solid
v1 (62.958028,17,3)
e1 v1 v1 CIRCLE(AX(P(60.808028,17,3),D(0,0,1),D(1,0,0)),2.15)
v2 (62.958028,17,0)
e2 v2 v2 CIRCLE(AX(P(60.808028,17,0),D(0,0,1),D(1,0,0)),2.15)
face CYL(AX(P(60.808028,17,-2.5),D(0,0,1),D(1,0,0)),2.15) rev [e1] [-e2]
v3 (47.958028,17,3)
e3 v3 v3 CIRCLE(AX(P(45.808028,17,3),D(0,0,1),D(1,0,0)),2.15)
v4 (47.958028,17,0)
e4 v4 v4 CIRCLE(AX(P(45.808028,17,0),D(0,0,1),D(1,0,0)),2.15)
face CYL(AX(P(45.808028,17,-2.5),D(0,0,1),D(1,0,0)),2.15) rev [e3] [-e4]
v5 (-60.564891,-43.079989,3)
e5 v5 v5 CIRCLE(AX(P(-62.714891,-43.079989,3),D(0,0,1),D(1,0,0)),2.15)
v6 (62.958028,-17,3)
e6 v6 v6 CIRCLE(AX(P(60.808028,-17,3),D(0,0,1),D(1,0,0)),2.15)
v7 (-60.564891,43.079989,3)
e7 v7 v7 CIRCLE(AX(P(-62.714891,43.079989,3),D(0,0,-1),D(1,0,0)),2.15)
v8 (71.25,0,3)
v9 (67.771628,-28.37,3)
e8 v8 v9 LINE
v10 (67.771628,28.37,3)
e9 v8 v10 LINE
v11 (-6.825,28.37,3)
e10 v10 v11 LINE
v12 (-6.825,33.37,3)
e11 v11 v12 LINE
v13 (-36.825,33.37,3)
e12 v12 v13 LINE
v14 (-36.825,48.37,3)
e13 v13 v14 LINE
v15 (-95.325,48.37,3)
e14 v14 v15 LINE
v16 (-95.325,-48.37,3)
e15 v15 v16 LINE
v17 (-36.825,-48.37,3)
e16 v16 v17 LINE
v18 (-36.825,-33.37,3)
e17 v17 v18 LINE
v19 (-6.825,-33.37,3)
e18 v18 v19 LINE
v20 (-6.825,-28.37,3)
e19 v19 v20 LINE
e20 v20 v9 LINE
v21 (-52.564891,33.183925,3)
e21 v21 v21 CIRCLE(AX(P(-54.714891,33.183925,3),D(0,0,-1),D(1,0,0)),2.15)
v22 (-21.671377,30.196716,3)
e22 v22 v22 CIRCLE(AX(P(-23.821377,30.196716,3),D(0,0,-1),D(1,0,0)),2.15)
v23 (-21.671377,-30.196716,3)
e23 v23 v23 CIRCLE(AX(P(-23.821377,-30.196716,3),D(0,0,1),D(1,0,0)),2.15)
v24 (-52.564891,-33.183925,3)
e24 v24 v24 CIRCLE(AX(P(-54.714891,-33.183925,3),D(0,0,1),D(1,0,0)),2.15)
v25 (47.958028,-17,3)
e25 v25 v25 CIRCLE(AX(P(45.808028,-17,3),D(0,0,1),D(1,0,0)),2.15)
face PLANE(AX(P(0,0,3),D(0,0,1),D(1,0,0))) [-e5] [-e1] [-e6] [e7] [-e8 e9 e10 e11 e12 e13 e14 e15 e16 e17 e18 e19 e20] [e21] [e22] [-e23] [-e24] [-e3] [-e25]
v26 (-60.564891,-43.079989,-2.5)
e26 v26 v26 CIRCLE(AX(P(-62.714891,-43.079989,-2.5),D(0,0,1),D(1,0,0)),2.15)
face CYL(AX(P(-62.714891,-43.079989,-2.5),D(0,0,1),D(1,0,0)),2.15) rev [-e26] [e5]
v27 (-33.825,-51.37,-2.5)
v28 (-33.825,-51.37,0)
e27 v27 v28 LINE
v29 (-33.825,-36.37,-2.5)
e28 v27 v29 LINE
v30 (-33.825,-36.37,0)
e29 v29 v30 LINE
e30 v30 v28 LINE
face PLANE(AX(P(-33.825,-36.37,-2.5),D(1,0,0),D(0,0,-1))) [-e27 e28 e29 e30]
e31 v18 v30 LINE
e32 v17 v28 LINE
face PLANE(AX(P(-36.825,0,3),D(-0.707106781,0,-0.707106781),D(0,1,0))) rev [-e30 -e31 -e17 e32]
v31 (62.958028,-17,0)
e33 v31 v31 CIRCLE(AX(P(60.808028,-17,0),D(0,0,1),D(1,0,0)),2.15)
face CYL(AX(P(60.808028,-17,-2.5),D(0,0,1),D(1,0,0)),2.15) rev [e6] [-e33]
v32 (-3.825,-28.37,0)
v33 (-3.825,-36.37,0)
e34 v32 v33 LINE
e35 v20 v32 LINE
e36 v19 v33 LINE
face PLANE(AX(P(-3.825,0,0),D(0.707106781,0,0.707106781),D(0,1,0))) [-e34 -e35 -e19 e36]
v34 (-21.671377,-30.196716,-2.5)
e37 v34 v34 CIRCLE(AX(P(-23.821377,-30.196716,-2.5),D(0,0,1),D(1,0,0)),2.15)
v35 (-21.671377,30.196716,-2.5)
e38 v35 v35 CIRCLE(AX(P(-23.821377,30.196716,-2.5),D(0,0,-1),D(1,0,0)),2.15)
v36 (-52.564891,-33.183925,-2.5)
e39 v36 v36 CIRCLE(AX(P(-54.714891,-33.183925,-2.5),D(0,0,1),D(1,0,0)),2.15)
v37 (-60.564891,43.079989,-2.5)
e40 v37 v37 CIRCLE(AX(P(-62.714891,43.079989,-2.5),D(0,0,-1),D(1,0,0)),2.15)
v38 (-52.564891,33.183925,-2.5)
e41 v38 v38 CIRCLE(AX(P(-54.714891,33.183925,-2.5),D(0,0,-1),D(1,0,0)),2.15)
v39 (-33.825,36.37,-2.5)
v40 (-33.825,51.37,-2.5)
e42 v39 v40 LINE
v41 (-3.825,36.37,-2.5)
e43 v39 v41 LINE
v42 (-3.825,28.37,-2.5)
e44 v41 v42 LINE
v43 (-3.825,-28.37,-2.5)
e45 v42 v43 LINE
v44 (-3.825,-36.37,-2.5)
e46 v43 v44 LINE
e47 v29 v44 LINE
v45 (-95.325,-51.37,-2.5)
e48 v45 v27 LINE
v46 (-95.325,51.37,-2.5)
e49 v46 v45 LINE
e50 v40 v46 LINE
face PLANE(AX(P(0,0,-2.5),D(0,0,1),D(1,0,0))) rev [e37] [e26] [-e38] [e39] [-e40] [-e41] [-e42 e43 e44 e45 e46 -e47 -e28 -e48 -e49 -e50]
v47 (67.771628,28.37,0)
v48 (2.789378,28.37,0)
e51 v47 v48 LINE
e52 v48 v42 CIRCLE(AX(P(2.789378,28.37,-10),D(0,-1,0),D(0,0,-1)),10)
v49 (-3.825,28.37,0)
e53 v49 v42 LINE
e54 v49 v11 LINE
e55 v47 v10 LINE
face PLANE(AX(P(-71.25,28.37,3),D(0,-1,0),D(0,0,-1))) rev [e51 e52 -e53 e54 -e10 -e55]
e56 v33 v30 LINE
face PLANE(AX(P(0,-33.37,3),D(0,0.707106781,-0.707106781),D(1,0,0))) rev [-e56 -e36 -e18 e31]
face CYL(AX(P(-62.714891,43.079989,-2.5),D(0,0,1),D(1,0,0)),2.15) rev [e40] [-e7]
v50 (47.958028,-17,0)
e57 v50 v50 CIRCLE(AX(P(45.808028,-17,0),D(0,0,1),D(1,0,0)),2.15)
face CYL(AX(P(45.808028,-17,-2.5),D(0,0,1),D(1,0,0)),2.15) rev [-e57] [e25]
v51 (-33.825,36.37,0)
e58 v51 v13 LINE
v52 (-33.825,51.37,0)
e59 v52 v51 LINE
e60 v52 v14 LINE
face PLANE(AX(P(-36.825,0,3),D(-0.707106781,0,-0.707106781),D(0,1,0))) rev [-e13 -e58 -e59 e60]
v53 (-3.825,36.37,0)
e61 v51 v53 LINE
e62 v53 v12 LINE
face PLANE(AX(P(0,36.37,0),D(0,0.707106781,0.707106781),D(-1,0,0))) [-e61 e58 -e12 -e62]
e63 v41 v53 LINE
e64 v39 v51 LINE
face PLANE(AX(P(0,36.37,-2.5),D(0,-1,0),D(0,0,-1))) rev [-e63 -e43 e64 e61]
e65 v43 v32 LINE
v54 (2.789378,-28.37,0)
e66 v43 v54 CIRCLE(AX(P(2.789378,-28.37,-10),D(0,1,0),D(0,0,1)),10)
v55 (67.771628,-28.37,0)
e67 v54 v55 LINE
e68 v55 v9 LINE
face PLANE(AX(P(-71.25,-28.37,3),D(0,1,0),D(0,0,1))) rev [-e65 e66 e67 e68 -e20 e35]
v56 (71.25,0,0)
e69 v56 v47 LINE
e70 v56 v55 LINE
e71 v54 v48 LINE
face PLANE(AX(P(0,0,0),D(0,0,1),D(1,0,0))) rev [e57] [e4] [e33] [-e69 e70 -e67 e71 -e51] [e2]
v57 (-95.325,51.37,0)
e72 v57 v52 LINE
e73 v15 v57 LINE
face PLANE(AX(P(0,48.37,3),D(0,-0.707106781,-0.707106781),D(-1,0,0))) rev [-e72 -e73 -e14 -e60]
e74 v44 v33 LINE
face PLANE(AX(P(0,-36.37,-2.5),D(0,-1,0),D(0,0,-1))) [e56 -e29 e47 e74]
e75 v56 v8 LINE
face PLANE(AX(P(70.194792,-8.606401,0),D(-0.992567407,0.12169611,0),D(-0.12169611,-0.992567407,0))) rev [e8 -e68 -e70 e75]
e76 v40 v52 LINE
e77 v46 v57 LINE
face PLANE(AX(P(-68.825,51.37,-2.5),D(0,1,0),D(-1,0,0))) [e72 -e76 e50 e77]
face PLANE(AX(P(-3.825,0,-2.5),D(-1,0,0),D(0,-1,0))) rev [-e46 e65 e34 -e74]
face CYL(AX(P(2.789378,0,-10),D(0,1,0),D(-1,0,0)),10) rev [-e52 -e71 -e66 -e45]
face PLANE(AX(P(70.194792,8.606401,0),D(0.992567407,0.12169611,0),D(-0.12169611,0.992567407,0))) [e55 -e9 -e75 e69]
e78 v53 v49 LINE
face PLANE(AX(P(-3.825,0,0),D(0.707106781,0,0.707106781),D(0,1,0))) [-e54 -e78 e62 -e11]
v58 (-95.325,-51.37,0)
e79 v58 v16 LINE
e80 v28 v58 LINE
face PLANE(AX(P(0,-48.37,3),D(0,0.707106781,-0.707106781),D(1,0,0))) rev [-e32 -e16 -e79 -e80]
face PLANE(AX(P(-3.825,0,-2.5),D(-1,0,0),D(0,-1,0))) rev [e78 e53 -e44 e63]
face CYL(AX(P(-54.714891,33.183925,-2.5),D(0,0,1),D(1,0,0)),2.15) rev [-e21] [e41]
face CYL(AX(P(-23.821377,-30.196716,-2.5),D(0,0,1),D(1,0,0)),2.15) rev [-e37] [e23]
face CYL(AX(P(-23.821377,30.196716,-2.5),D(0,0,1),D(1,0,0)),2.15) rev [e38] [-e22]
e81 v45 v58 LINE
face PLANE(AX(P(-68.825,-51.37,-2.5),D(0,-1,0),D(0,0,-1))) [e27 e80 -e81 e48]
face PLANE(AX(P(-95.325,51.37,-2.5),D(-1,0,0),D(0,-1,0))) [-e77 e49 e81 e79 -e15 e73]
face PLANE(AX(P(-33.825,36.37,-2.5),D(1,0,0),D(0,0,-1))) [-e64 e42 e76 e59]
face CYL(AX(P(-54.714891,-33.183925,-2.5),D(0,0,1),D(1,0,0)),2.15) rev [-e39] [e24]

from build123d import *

# Parameters (mm, degrees)
SKETCH1_W           = 142.5
SKETCH1_H           = 56.74
BOSS_EXTRUDE1_DEPTH = 3
CUT_EXTRUDE1_DEPTH  = 77.749067747
SKETCH3_W           = 2.425
SKETCH3_H           = 56.74
CUT_EXTRUDE2_DEPTH  = 77.749067747
SKETCH4_W           = 65
SKETCH4_H           = 8
SKETCH4_H_2         = 56.74
BOSS_EXTRUDE2_DEPTH = 5.5
FILLET1_R           = 10
SKETCH5_R           = 2.15
CUT_EXTRUDE3_DEPTH  = 81.18472049
BOSS_EXTRUDE5_DEPTH = 5.5
CHAMFER6_SIZE       = 3
SKETCH11_R          = 2.15
CUT_EXTRUDE5_DEPTH  = 109.425008762


with BuildPart() as part:
    # Sketch1 → Boss-Extrude1 (new body)
    with BuildSketch(Plane.XY):
        Rectangle(SKETCH1_W, SKETCH1_H)
    extrude(amount=BOSS_EXTRUDE1_DEPTH)

    # Sketch2 → Cut-Extrude1 (cut, through all)
    with BuildSketch(Plane.XY.offset(3)):
        Polygon((67.771628048, 28.37), (71.25, 0), (71.25, 28.37), align=None)
        Polygon((71.25, -28.37), (71.25, 0), (67.771628048, -28.37), align=None)
    extrude(amount=-CUT_EXTRUDE1_DEPTH, mode=Mode.SUBTRACT)

    # Sketch3 → Cut-Extrude2 (cut, through all)
    with BuildSketch(Plane.XY.offset(3)):
        with Locations((-70.0375, 0)):
            Rectangle(SKETCH3_W, SKETCH3_H)
    extrude(amount=-CUT_EXTRUDE2_DEPTH, mode=Mode.SUBTRACT)

    # Sketch4 → Boss-Extrude2 (add)
    with BuildSketch(Plane.XY.offset(3)):
        with Locations((-36.325, 32.37)):
            Rectangle(SKETCH4_W, SKETCH4_H)
        with Locations((-36.325, 0)):
            Rectangle(SKETCH4_W, SKETCH4_H_2)
        with Locations((-36.325, -32.37)):
            Rectangle(SKETCH4_W, SKETCH4_H)
    extrude(amount=-BOSS_EXTRUDE2_DEPTH)

    # Fillet1
    # the kernel refuses this fillet: 10 mm, written as the material it adds along each edge
    with BuildSketch(Plane(origin=(-3.825, 28.37, 0), x_dir=(1, 0, 0), z_dir=(0, -1, 0))) as fillet1_piece_1:
        with BuildLine():
            CenterArc((6.614378278, -10), FILLET1_R, 90, 41.409622109)
            Line((0, -2.5), (-0.132287566, -2.35))
            ThreePointArc((-0.132287566, -2.35), (-0.2, -1.25), (-0.2, 0))
            Line((-0.2, 0), (0, 0.2))
            Line((0, 0.2), (6.614378278, 0.2))
            Line((6.614378278, 0.2), (6.614378278, 0))
        make_face()
    extrude(amount=56.74)

    # Sketch5 → Cut-Extrude3 (cut, through all)
    with BuildSketch(Plane.XY.offset(3)):
        with Locations((60.808027892, 17)):
            Circle(SKETCH5_R)
        with Locations((60.808027892, -17)):
            Circle(SKETCH5_R)
        with Locations((45.808027892, 17)):
            Circle(SKETCH5_R)
        with Locations((45.808027892, -17)):
            Circle(SKETCH5_R)
    extrude(amount=-CUT_EXTRUDE3_DEPTH, mode=Mode.SUBTRACT)

    # Sketch10 → Boss-Extrude5 (add)
    with BuildSketch(Plane.XY.offset(3)):
        Polygon((-68.825, 36.37), (-33.825, 36.37), (-33.825, 51.37), (-68.825, 51.37), (-95.325, 51.37), (-95.325, -51.37), (-68.825, -51.37), (-33.825, -51.37), (-33.825, -36.37), (-68.825, -36.37), align=None)
    extrude(amount=-BOSS_EXTRUDE5_DEPTH)

    # Chamfer6
    chamfer6_edges = [part.edges().sort_by_distance(p)[0] for p in [
        (-18.825, 36.37, 3),
        (-18.825, -36.37, 3),
        (-33.825, 43.87, 3),
        (-64.575, 51.37, 3),
        (-64.575, -51.37, 3),
        (-33.825, -43.87, 3),
        (-3.825, 32.37, 3),
        (-3.825, -32.37, 3),
    ]]
    chamfer(chamfer6_edges, length=CHAMFER6_SIZE)

    # Sketch11 → Cut-Extrude5 (cut, through all)
    with BuildSketch(Plane.XY.offset(3)):
        with Locations((-62.71489096, -43.079989287)):
            Circle(SKETCH11_R)
        with Locations((-54.714891019, -33.183924722)):
            Circle(SKETCH11_R)
        with Locations((-23.821377075, -30.196715875)):
            Circle(SKETCH11_R)
    cut_extrude5 = extrude(amount=-CUT_EXTRUDE5_DEPTH, mode=Mode.SUBTRACT)

    # Mirror2: Cut-Extrude5 across plane
    add(cut_extrude5.mirror(Plane.ZX), mode=Mode.SUBTRACT)


solid = part.part
